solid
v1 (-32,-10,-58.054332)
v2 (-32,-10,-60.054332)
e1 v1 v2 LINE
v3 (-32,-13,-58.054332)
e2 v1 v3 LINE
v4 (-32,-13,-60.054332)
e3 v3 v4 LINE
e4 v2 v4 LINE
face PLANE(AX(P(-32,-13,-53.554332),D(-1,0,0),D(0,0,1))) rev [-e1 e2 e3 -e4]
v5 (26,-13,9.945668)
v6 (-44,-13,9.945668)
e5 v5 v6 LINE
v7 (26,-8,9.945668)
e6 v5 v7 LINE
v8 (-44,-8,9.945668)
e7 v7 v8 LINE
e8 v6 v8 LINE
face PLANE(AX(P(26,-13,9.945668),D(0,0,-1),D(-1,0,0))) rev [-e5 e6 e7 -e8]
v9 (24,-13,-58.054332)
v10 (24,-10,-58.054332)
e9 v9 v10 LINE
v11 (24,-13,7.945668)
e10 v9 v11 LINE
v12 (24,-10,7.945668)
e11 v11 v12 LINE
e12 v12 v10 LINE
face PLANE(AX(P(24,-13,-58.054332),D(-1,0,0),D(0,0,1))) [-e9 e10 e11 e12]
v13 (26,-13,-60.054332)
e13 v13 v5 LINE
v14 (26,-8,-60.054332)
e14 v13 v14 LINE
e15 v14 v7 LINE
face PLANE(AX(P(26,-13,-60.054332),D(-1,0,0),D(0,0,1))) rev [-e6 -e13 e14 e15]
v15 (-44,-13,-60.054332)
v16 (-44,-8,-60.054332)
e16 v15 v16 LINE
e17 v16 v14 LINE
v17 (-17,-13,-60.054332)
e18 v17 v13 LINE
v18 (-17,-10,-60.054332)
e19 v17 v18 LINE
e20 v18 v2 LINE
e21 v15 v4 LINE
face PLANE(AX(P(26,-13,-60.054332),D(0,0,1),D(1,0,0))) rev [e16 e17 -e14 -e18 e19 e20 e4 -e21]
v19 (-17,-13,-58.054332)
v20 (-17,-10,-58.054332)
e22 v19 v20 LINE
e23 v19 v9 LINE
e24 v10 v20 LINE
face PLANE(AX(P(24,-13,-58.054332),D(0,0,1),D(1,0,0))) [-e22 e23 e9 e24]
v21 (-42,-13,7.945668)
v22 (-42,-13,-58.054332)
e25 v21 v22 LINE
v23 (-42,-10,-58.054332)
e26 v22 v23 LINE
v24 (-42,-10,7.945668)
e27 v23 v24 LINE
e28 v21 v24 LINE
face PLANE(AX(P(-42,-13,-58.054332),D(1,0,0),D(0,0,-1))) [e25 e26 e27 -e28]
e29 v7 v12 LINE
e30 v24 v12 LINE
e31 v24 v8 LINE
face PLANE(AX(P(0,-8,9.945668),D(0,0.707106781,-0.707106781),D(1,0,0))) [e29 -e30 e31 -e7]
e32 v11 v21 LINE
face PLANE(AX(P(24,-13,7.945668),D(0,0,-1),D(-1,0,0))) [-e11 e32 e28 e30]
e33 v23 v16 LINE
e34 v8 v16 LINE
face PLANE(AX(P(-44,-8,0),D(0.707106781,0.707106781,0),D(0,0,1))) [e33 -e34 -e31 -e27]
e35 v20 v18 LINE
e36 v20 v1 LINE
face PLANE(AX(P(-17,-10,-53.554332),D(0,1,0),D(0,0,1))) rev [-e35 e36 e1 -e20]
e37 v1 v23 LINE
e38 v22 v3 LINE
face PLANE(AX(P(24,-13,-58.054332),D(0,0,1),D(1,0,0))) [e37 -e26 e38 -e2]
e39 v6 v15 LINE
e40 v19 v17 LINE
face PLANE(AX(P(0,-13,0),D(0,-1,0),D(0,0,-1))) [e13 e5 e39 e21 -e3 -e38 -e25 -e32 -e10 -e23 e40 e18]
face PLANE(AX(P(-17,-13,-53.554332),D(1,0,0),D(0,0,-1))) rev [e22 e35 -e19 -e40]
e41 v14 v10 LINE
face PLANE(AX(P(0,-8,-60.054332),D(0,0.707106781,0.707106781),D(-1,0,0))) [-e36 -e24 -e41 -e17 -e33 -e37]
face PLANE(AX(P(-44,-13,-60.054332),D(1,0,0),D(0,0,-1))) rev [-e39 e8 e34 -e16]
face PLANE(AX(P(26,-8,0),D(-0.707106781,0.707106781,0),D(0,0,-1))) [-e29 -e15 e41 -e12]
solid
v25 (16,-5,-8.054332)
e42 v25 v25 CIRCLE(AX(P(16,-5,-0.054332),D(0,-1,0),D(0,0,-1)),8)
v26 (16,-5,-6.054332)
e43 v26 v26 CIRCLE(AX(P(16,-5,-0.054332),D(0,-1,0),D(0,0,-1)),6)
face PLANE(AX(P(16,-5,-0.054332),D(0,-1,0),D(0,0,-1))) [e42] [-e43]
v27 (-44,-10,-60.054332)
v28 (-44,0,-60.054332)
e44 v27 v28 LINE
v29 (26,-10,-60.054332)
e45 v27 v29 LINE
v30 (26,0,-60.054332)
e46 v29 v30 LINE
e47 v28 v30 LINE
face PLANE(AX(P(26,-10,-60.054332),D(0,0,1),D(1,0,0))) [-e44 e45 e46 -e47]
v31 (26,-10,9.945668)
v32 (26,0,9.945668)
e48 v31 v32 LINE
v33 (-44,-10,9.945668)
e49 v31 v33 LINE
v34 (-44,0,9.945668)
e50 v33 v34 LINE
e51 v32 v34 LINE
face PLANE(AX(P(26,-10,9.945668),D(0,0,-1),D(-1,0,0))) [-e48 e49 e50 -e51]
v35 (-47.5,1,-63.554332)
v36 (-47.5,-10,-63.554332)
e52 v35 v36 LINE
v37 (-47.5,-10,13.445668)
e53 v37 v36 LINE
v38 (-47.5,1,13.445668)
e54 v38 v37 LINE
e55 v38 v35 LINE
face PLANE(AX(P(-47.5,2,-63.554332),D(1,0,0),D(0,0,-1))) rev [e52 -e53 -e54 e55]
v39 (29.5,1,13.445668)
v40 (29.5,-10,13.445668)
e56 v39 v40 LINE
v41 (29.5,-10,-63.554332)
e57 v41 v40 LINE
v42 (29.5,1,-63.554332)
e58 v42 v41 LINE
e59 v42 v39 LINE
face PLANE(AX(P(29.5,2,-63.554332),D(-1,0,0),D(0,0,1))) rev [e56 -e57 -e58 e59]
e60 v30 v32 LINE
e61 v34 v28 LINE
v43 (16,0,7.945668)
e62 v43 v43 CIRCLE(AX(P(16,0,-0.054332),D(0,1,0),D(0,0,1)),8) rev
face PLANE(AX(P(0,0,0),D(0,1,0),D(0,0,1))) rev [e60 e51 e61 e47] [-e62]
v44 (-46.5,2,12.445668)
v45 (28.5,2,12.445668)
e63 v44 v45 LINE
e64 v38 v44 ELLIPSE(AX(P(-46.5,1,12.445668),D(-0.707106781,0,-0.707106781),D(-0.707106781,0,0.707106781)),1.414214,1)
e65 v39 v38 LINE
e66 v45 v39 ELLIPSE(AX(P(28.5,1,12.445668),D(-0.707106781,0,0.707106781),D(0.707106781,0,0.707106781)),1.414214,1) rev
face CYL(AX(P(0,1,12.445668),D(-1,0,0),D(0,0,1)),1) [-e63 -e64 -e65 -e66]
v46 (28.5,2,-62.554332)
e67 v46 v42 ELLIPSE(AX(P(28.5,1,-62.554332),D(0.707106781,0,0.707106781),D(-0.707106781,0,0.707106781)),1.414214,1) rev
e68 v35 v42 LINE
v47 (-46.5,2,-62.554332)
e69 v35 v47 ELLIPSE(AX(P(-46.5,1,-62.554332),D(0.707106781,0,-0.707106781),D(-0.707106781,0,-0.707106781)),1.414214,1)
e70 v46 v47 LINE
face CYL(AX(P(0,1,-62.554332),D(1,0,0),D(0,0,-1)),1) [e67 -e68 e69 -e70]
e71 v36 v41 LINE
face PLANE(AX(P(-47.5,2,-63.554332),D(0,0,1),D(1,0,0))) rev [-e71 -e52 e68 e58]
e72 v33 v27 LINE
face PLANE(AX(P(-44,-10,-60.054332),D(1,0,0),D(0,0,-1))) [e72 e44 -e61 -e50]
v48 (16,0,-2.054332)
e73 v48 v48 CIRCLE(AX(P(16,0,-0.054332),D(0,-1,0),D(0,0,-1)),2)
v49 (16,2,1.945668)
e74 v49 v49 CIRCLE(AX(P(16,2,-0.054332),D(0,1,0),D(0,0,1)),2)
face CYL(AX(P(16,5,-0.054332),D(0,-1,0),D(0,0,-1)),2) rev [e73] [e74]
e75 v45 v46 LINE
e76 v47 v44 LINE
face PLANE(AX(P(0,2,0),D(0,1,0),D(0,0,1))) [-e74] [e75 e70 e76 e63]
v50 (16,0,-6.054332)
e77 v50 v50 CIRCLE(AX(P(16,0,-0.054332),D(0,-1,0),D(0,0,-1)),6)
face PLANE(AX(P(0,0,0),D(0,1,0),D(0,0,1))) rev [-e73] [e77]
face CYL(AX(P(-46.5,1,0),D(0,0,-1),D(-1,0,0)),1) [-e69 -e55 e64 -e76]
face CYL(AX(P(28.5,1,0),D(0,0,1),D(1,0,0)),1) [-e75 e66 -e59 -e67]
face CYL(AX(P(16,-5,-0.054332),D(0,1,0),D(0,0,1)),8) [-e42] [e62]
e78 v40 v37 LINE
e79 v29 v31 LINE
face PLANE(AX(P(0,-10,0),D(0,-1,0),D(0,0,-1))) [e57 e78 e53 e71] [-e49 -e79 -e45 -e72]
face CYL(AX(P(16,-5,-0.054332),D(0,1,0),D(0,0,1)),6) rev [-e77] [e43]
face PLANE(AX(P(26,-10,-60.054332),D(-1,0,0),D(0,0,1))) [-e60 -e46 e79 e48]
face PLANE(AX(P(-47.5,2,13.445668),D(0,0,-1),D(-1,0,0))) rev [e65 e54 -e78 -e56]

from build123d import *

# Parameters (mm, degrees)
SKETCH1_W           = 77
SKETCH1_H           = 77
BOSS_EXTRUDE1_DEPTH = 2
BOSS_EXTRUDE2_START = 8
SKETCH3_W           = 70
SKETCH3_H           = 70
SKETCH3_W_2         = 66
SKETCH3_H_2         = 66
BOSS_EXTRUDE2_DEPTH = 5
SKETCH5_W           = 77
SKETCH5_H           = 77
SKETCH5_W_2         = 70
SKETCH5_H_2         = 70
BOSS_EXTRUDE3_DEPTH = 10
SKETCH7_W           = 15
SKETCH7_H           = 3
CUT_EXTRUDE2_DEPTH  = 10
CHAMFER1_SIZE       = 2
SKETCH9_R           = 8
SKETCH9_R_2         = 6
BOSS_EXTRUDE6_DEPTH = 5
SKETCH10_R          = 2
CUT_EXTRUDE3_DEPTH  = 5
FILLET1_R           = 1


with BuildPart() as part:
    # Sketch1 → Boss-Extrude1 (new body)
    with BuildSketch(Plane(origin=(0, 0, 0), x_dir=(1, 0, 0), z_dir=(0, 1, 0))):
        with Locations((-9, 25.054332031)):
            Rectangle(SKETCH1_W, SKETCH1_H)
    extrude(amount=BOSS_EXTRUDE1_DEPTH)

    # Sketch5 → Boss-Extrude3 (add)
    with BuildSketch(Plane.XZ):
        with Locations((-9, -25.054332031)):
            Rectangle(SKETCH5_W, SKETCH5_H)
        with Locations((-9, -25.054332031)):
            Rectangle(SKETCH5_W_2, SKETCH5_H_2, mode=Mode.SUBTRACT)
    extrude(amount=BOSS_EXTRUDE3_DEPTH)

    # Sketch9 → Boss-Extrude6 (add)
    with BuildSketch(Plane.XZ):
        with Locations(Location((16, -0.054332031, 0), (0, 0, 90))):
            Circle(SKETCH9_R)
        with Locations(Location((16, -0.054332031, 0), (0, 0, 270))):
            Circle(SKETCH9_R_2, mode=Mode.SUBTRACT)
    extrude(amount=BOSS_EXTRUDE6_DEPTH)

    # Sketch10 → Cut-Extrude3 (cut)
    with BuildSketch(Plane.XZ):
        with Locations(Location((16, -0.054332031, 0), (0, 0, 270))):
            Circle(SKETCH10_R)
    extrude(amount=-CUT_EXTRUDE3_DEPTH, mode=Mode.SUBTRACT)

    # Fillet1
    fillet1_edges = [part.edges().sort_by_distance(p)[0] for p in [
        (-47.5, 2, -25.054332031),
        (-9, 2, 13.445667969),
        (29.5, 2, -25.054332031),
        (-9, 2, -63.554332031),
    ]]
    fillet(fillet1_edges, radius=FILLET1_R)


with BuildPart() as body_2:
    # Sketch3 → Boss-Extrude2 (new body)
    with BuildSketch(Plane.XZ.offset(BOSS_EXTRUDE2_START)):
        with Locations((-9, -25.054332031)):
            Rectangle(SKETCH3_W, SKETCH3_H)
        with Locations((-9, -25.054332031)):
            Rectangle(SKETCH3_W_2, SKETCH3_H_2, mode=Mode.SUBTRACT)
    extrude(amount=BOSS_EXTRUDE2_DEPTH)

    # Sketch7 → Cut-Extrude2 (cut)
    with BuildSketch(Plane(origin=(0, 0, -63.554332031), x_dir=(-1, 0, 0), z_dir=(0, 0, -1))):
        with Locations((24.5, -11.5)):
            Rectangle(SKETCH7_W, SKETCH7_H)
    extrude(amount=-CUT_EXTRUDE2_DEPTH, mode=Mode.SUBTRACT)

    # Chamfer1
    chamfer1_edges = [body_2.edges().sort_by_distance(p)[0] for p in [
        (-42, -8, -25.054332031),
        (-9, -8, -58.054332031),
        (24, -8, -25.054332031),
        (-9, -8, 7.945667969),
    ]]
    chamfer(chamfer1_edges, length=CHAMFER1_SIZE - 0.0001)  # a hair under: the kernel refuses the full size


solid = Compound([part.part, body_2.part])
